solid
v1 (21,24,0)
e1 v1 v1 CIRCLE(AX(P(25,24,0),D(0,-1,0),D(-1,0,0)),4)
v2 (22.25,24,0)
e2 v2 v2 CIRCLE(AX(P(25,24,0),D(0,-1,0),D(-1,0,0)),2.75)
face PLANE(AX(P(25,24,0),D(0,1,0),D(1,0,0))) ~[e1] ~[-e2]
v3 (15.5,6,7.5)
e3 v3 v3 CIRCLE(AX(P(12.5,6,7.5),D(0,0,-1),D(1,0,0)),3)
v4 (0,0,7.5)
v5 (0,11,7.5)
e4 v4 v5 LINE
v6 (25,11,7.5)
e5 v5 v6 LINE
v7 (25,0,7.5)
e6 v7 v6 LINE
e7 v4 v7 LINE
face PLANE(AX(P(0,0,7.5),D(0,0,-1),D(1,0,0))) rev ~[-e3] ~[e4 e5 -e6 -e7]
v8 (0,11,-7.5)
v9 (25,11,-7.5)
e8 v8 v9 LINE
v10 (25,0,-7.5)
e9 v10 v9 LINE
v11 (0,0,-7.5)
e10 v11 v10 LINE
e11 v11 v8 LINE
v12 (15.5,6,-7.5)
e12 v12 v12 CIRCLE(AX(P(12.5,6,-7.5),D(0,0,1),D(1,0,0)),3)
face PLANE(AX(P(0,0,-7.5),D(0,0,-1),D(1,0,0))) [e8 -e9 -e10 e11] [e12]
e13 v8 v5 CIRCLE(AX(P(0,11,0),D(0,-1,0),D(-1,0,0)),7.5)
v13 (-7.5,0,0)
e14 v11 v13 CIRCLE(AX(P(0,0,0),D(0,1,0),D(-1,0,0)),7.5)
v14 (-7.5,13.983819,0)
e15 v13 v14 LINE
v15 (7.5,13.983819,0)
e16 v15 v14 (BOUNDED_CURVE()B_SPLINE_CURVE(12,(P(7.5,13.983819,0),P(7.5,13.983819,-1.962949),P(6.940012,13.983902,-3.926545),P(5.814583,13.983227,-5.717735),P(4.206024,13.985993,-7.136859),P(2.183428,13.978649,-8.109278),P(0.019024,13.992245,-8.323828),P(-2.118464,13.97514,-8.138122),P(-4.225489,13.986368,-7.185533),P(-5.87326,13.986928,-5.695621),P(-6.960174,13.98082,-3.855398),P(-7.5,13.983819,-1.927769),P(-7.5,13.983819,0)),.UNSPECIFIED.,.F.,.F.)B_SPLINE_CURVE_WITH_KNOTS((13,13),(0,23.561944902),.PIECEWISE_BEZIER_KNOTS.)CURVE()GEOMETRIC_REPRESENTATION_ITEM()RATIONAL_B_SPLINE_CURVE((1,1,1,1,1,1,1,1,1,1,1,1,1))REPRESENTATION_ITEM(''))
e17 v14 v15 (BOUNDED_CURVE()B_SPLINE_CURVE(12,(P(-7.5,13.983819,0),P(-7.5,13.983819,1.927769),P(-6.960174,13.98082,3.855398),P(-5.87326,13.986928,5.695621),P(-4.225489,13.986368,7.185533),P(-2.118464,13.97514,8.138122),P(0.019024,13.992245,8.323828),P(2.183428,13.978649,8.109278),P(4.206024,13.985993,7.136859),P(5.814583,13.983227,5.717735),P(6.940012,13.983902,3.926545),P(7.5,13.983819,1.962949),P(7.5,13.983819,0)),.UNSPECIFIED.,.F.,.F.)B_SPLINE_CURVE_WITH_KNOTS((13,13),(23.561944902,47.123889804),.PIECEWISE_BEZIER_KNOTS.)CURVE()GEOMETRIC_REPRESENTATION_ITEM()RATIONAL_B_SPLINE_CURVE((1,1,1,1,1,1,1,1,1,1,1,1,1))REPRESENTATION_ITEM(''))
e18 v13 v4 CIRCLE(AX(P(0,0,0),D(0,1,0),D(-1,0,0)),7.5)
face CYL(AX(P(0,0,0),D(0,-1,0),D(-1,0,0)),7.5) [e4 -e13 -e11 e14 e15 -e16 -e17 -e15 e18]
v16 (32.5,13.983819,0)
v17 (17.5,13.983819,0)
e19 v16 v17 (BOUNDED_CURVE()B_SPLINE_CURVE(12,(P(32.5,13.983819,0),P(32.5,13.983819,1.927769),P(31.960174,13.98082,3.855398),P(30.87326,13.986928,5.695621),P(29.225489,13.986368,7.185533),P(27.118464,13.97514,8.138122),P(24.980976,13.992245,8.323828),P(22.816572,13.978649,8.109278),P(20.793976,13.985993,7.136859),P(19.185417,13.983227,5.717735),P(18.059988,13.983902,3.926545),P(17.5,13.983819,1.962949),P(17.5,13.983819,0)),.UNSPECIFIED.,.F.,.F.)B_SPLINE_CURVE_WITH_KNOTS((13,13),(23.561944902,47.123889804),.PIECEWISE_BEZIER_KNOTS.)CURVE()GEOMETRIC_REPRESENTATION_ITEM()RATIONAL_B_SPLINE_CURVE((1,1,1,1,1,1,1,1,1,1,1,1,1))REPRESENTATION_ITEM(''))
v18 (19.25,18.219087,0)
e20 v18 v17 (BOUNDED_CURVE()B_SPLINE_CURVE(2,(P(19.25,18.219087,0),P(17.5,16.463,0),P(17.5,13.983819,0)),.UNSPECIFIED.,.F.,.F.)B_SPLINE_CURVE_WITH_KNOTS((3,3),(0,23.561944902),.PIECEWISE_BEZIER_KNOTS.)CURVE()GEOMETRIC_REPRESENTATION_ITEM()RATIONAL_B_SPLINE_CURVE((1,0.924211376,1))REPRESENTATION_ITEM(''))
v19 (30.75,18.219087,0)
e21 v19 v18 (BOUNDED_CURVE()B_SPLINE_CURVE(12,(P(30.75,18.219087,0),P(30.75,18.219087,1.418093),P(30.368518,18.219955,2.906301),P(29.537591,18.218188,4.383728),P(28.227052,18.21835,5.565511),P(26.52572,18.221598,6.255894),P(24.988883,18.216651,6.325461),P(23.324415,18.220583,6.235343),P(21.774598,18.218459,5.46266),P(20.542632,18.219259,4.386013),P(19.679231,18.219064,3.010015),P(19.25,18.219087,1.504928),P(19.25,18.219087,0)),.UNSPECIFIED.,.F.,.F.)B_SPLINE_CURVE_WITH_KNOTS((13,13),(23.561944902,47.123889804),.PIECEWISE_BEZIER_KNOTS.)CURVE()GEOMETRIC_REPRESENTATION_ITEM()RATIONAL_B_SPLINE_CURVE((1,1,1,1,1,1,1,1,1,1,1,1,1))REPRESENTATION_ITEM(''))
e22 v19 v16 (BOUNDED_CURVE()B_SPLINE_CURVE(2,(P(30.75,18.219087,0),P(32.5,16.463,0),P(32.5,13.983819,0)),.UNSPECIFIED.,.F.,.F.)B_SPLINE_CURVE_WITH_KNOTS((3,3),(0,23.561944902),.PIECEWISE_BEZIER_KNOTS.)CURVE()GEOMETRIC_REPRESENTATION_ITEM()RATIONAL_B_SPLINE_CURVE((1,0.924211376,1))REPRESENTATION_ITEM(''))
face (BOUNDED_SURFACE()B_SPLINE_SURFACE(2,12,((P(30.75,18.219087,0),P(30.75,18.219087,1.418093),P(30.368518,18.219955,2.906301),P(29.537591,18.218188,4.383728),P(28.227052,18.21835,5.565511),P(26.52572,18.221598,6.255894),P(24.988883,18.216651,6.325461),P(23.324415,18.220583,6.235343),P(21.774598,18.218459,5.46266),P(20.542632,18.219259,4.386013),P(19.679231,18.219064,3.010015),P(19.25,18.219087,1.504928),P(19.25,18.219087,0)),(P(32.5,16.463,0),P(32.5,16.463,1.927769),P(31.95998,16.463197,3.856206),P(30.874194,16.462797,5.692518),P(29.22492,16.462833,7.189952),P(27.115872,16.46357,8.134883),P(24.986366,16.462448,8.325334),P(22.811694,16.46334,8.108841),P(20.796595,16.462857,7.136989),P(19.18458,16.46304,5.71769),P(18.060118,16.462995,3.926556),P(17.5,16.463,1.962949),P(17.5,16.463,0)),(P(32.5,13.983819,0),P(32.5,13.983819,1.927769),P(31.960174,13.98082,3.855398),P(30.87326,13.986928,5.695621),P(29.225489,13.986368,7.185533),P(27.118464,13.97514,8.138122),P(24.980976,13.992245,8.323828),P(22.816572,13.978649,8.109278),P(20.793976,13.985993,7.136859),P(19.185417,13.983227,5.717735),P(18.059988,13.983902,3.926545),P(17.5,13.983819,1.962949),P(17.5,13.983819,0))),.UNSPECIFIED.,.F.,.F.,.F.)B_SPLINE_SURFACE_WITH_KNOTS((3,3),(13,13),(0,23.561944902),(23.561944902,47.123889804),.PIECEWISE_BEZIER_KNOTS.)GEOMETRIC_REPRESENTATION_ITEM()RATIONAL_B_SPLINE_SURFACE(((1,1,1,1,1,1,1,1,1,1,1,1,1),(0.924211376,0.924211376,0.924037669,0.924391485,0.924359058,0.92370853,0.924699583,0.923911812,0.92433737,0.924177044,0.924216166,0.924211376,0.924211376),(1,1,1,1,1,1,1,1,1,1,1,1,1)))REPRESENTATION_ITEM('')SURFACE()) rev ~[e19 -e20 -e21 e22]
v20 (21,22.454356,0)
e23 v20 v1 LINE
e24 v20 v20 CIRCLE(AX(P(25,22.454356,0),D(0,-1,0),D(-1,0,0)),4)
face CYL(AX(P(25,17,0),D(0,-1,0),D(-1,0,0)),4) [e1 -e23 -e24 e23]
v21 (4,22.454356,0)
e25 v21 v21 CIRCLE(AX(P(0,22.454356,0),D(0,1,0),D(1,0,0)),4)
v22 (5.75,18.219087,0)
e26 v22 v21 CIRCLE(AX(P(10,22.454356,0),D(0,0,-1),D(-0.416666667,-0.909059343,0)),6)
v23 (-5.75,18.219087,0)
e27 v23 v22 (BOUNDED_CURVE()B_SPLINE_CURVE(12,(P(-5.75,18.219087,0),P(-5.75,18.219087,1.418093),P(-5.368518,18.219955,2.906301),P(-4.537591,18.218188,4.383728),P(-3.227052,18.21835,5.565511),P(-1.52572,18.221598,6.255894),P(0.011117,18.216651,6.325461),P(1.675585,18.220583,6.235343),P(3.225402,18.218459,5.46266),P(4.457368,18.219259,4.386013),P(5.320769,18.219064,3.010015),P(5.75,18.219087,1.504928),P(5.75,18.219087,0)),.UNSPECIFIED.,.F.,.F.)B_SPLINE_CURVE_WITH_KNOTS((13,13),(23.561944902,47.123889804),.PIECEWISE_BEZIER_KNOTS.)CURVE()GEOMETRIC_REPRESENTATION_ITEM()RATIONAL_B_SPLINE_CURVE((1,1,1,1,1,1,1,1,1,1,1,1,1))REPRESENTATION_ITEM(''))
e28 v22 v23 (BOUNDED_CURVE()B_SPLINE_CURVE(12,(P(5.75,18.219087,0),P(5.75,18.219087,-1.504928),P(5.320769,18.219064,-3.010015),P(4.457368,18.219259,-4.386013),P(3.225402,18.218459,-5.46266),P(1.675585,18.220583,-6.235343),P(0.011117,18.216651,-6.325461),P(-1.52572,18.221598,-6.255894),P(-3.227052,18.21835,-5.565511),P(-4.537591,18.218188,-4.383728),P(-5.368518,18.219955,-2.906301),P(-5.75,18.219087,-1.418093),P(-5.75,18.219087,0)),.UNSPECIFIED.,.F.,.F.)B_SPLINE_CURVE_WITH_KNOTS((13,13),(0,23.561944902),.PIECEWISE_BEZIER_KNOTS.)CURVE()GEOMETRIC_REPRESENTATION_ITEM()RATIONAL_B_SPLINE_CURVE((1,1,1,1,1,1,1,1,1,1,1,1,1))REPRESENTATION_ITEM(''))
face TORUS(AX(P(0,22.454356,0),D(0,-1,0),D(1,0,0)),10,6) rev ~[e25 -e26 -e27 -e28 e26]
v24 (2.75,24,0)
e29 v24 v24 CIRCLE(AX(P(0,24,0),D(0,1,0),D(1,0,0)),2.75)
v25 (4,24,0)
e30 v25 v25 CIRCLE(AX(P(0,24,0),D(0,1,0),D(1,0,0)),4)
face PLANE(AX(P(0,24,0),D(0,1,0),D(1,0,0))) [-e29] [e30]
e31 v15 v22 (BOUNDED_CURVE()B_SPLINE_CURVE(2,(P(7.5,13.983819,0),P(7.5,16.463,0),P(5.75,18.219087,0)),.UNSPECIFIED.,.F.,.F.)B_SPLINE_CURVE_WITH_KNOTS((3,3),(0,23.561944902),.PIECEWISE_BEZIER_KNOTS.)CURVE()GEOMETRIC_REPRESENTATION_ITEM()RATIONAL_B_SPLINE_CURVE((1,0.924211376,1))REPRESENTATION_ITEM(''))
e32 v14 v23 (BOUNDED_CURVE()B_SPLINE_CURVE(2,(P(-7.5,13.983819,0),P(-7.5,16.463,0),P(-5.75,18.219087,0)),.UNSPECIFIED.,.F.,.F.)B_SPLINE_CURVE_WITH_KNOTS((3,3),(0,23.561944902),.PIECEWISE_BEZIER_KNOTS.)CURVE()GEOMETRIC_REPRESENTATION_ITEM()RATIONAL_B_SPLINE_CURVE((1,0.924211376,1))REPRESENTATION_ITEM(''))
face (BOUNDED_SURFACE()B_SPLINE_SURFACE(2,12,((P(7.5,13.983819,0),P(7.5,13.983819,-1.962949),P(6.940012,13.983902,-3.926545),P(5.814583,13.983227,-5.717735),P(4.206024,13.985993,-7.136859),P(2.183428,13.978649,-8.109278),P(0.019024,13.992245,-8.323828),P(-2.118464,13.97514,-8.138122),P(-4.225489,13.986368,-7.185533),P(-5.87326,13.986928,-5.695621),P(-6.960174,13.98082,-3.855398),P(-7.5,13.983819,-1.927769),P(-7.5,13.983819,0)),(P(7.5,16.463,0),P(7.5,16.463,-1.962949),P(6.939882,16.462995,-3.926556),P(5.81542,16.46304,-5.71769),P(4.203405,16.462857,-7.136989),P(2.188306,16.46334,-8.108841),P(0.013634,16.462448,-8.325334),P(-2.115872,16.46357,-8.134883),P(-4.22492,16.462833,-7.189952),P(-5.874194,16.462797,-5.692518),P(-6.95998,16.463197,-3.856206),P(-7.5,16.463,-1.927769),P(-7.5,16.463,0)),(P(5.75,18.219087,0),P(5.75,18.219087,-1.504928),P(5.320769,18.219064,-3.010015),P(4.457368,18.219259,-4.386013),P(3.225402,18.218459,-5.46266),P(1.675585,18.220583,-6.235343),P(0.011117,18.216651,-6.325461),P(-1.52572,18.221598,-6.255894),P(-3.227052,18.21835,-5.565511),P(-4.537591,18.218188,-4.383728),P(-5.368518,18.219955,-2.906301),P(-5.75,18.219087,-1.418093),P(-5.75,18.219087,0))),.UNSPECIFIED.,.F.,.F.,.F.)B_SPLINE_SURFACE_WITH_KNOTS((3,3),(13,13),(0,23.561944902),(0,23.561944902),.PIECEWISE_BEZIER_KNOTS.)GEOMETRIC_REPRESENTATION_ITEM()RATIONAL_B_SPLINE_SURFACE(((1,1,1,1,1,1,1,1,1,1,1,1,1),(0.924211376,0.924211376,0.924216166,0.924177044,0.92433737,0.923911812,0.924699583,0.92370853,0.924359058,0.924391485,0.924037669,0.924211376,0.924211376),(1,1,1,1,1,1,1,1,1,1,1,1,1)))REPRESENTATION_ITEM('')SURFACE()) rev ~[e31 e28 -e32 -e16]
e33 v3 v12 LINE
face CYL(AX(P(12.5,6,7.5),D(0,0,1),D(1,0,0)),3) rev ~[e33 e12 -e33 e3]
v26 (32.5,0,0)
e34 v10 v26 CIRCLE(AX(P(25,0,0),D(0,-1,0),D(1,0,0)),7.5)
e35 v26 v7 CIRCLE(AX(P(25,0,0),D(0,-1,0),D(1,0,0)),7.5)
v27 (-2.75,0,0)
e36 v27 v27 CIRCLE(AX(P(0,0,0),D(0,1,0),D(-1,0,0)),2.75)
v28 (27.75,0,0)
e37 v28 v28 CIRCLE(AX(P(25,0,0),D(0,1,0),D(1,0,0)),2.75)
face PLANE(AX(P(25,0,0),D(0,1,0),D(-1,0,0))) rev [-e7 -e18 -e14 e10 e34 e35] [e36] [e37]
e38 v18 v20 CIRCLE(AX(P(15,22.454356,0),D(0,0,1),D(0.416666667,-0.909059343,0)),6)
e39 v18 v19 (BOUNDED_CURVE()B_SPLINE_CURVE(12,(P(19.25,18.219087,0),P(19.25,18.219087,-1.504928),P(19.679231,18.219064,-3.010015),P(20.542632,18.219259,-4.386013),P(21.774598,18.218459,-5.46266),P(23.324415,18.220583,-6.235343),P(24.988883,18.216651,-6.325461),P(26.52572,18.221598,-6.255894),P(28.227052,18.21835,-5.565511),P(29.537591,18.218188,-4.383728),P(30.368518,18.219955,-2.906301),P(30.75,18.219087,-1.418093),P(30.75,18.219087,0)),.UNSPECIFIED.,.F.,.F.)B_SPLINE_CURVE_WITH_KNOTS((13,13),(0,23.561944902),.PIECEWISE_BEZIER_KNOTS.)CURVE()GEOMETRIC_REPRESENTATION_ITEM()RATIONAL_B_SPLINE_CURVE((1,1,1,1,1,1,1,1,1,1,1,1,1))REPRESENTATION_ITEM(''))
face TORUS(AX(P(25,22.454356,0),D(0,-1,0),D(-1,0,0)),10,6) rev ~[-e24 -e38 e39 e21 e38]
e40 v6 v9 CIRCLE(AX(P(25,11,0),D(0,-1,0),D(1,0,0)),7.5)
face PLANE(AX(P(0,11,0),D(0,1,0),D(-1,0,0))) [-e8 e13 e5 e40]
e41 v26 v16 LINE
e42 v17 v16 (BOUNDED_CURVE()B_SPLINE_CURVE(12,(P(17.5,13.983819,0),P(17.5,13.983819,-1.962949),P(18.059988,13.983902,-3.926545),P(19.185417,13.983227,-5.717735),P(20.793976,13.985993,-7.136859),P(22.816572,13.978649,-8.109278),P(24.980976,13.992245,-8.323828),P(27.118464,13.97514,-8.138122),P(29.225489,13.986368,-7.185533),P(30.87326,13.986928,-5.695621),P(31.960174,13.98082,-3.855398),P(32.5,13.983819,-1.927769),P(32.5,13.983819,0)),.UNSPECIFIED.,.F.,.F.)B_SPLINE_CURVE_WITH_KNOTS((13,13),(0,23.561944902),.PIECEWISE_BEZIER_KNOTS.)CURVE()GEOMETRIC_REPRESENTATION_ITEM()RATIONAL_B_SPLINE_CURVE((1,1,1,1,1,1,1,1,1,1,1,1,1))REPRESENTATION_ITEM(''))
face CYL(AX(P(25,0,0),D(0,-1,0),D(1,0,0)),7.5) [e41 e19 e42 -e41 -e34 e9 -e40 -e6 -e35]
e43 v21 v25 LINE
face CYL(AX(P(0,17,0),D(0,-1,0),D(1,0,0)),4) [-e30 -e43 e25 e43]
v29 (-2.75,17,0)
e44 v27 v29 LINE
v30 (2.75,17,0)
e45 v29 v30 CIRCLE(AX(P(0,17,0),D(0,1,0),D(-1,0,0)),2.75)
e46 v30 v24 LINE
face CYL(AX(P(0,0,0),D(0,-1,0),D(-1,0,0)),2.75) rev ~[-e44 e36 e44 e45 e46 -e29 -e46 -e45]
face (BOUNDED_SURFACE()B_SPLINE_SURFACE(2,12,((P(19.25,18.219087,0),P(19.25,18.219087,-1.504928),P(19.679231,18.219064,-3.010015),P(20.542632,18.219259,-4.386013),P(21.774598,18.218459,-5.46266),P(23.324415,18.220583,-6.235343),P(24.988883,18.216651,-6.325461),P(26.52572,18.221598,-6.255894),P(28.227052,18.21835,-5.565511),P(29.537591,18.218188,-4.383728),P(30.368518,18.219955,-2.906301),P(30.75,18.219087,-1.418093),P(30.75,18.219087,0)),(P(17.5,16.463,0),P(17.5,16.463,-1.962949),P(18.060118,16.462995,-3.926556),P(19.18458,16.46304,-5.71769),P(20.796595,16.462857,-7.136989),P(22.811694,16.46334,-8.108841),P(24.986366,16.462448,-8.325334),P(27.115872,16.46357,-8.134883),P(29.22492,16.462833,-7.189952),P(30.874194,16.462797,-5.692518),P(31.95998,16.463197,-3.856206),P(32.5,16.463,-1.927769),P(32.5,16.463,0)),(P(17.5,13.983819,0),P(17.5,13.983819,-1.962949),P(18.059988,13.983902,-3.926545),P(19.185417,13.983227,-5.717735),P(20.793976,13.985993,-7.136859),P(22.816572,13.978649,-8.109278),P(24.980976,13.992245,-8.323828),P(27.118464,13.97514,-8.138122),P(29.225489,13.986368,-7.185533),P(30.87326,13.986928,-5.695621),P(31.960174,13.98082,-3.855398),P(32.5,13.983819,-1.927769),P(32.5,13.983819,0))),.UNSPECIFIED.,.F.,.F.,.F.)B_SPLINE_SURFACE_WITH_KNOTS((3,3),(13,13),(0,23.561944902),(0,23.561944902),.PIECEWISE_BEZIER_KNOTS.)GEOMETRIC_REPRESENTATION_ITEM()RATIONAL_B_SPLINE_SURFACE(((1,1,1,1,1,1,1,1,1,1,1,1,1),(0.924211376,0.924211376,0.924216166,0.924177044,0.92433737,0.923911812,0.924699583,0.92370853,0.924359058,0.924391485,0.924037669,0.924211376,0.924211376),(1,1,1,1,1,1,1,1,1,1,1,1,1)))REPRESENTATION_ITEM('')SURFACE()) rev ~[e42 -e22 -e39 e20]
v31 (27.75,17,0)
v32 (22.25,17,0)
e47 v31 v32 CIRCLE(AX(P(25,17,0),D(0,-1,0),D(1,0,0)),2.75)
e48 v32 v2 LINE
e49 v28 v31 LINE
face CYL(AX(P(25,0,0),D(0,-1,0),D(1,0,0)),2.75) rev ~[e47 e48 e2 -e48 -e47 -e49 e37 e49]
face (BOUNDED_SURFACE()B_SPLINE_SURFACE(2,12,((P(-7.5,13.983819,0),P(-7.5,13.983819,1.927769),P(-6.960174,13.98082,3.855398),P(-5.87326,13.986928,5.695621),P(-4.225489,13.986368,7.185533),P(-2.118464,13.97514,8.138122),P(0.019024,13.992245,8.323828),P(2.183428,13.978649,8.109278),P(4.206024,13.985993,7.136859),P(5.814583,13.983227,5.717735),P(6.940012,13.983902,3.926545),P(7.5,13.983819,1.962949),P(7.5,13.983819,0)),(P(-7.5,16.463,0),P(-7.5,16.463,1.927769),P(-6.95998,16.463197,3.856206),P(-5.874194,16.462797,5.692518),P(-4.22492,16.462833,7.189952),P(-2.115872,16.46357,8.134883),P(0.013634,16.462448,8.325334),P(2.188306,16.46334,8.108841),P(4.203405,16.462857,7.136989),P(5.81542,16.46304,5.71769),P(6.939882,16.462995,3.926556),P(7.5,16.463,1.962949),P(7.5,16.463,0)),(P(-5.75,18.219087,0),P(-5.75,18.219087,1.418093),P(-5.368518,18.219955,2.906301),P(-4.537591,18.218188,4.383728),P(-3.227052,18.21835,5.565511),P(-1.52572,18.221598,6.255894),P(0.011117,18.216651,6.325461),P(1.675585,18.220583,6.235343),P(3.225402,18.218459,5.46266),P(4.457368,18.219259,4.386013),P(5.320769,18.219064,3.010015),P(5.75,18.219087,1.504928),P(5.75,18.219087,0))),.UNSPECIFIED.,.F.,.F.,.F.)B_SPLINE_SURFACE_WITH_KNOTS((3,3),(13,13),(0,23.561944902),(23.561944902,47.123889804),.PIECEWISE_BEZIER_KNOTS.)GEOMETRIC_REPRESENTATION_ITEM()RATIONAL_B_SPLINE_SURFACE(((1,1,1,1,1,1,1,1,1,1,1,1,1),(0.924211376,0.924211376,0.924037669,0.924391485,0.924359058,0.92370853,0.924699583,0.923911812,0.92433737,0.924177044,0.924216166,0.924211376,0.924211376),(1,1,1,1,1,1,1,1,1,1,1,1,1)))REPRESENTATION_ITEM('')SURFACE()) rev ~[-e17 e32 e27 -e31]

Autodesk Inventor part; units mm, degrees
ref_plane "XZ Plane" through (0, 0, 0) normal (0, 1, 0) x (-1, 0, 0)
ref_plane "XY Plane" through (0, 0, 0) normal (0, 0, 1) x (1, 0, 0)
sketch "Sketch1" plane through (0, 0, 0) normal (0, 1, 0) x (-1, 0, 0)
  circle A0 centre (0, 0) radius 7.5
  circle A1 centre (0, 0) radius 2.75
  dimension "d0" = 15
  dimension "d1" = 5.5
extrude "Extrusion1" add sketch "Sketch1" along normal blind 17
sketch "Sketch2" plane through (0, 17, 0) normal (0, 1, 0) x (1, 0, 0)
  circle A0 centre (0, 0) radius 2.75 projected
  circle A1 centre (0, 0) radius 2.75
  circle A2 centre (0, 0) radius 4
  dimension "d4" = 5.5
  dimension "d5" = 8
extrude "Extrusion2" add sketch "Sketch2" along normal blind 7
fillet "Fillet1" radius 6 1 edges at (-4, 17, 0)
fillet "Fillet2" radius 6 2 edges at (0, 17, -7.5) (0, 17, 7.5)
ref_plane "Work Plane1" through (12.5, 0, 0) normal (1, 0, 0) x (0, 1, 0)
mirror "Mirror1" about plane through (12.5, 0, 0) normal (1, 0, 0) of "Extrusion1", "Extrusion2", "Fillet1", "Fillet2"
sketch "Sketch3" plane through (0, 0, 0) normal (0, 1, 0) x (-1, 0, 0)
  circle A0 centre (-25, 0) radius 2.75 projected
  line L0 (-25, 0) -> (-25, 2.75)
  line L1 (-25, 0) -> (-25, -2.75)
  line L2 (0, 0) -> (0, -2.75)
  circle A1 centre (0, 0) radius 2.75 projected
  line L3 (0, 0) -> (0, 2.75)
  line L4 (-25, 2.75) -> (0, 2.75)
  line L5 (0, 2.75) -> (0, 7.5)
  line L6 (0, 7.5) -> (-25, 7.5)
  line L7 (-25, 7.5) -> (-25, 2.75)
  line L8 (-25, -2.75) -> (0, -2.75)
  line L9 (0, -2.75) -> (0, -7.5)
  line L10 (0, -7.5) -> (-25, -7.5)
  line L11 (-25, -7.5) -> (-25, -2.75)
  dimension "d11" = 25
  dimension "d12" = 4.75
  dimension "d13" = 25
  dimension "d14" = 4.75
extrude "Extrusion3" add sketch "Sketch3" along normal blind 11 contours A0 L4 A1 L8 | L7 L6 L5 L4 | L8 L9 L10 L11
sketch "Sketch4" plane through (0, 0, 7.5) normal (0, 0, 1) x (1, 0, 0)
  line L0 (25, 11) -> (0, 11) projected
  line L1 (12.5, 11) -> (12.5, 6)
  circle A0 centre (12.5, 6) radius 3
  point P0 (0, 0)
  dimension "d17" = 5
  dimension "d18" = 6
extrude "Extrusion4" cut sketch "Sketch4" against normal through all
properties part number "4mm_Roller_Spacer_extended"
